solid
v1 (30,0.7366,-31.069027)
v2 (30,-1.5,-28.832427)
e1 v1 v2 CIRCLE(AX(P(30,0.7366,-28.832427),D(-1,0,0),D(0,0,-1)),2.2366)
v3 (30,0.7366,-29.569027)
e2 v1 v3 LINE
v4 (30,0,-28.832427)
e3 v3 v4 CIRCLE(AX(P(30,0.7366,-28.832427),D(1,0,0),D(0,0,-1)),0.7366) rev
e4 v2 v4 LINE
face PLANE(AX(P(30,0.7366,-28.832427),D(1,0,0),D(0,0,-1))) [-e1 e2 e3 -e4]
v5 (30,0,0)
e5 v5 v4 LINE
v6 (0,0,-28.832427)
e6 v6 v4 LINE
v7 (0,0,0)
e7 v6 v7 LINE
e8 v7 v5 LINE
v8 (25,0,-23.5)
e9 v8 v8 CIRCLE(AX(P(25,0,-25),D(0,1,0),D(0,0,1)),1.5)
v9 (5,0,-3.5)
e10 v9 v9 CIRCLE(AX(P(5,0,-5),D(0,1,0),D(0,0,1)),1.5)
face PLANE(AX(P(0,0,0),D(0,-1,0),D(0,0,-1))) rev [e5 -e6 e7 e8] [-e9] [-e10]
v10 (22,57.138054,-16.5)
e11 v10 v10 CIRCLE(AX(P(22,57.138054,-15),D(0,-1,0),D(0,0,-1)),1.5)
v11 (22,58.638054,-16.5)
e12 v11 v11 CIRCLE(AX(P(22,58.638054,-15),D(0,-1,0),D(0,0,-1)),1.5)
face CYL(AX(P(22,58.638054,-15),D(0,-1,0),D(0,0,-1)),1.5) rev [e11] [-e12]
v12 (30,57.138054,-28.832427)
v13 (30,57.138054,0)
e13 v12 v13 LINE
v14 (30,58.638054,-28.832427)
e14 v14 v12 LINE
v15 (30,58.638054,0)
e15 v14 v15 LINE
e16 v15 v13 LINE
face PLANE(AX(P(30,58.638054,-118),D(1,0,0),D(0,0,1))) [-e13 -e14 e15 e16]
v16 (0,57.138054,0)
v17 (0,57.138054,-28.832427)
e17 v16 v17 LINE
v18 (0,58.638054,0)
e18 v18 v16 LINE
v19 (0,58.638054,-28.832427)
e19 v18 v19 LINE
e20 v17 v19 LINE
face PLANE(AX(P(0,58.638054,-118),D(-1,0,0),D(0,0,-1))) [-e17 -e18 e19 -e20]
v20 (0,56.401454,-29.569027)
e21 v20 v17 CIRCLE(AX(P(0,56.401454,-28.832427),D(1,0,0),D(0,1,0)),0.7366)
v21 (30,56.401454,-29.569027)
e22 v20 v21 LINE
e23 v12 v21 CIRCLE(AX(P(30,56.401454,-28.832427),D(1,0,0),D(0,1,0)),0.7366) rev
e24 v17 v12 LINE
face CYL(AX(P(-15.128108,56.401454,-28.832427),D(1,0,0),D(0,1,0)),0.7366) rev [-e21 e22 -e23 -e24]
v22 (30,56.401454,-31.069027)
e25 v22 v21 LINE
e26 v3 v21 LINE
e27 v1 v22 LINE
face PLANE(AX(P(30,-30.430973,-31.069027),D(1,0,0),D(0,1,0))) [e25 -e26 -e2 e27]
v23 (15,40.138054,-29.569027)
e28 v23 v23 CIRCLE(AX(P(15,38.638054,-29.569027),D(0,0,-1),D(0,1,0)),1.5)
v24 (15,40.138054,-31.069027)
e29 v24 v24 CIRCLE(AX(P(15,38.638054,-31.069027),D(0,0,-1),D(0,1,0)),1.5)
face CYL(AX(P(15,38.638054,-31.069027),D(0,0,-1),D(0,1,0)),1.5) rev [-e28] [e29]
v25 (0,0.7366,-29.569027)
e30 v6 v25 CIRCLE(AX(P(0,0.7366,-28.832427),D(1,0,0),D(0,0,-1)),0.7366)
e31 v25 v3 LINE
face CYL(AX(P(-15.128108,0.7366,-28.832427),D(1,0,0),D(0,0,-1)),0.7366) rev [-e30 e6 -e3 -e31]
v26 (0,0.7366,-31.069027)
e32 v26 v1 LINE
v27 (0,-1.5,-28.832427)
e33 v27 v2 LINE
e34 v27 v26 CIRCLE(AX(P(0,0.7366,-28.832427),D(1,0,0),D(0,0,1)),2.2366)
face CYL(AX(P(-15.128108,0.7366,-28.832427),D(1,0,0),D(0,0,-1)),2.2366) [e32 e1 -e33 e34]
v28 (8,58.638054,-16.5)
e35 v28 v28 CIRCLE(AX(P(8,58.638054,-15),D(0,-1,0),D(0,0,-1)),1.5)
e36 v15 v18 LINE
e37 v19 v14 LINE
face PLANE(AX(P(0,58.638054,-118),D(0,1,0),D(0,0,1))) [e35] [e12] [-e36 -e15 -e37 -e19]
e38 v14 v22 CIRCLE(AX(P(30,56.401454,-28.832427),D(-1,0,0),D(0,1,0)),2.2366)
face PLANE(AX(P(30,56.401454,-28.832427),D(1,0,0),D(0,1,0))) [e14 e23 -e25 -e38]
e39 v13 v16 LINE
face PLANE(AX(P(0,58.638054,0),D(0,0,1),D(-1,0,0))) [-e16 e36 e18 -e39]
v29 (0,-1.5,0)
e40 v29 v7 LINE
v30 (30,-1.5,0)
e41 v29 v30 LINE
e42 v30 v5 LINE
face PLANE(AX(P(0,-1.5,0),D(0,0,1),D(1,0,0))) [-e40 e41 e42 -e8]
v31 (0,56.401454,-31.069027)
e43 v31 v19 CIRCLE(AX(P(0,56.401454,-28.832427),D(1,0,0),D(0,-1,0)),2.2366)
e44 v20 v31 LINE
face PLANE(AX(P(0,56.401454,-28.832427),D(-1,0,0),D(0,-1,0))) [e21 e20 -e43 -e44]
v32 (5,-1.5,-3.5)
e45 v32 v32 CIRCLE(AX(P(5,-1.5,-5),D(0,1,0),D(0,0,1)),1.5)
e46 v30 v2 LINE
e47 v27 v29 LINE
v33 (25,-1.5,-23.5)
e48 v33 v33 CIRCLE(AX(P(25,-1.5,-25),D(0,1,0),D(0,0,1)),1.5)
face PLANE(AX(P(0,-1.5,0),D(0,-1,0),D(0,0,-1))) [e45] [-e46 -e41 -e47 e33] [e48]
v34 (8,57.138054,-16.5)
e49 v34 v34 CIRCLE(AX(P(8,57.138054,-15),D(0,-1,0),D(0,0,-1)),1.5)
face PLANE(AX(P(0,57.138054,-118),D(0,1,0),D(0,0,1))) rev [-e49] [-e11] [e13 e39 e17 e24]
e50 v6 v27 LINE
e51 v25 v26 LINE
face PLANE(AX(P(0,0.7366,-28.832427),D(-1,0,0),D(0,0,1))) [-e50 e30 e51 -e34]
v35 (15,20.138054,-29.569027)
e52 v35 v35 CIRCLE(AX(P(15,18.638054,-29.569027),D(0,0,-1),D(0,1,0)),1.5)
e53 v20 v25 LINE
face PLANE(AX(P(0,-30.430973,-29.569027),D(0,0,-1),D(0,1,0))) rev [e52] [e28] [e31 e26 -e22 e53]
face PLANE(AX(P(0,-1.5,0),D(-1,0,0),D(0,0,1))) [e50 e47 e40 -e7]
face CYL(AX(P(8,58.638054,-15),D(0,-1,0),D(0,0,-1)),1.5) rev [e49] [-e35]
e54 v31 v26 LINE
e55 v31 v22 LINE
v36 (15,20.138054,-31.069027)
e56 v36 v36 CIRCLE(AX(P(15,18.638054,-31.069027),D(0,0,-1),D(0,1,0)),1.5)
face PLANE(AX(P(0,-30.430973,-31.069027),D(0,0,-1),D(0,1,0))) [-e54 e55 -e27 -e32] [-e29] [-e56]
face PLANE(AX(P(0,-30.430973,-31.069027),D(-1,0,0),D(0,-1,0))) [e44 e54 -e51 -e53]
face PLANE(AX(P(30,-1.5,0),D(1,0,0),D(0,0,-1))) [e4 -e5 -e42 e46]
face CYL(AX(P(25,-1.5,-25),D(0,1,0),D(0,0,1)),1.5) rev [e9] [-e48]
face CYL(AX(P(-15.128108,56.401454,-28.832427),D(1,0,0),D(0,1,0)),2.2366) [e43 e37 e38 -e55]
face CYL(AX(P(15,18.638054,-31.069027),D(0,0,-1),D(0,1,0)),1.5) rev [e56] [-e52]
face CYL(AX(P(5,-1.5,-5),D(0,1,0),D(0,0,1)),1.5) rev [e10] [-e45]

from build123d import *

# Parameters (mm, degrees)
SKETCH1_W                       = 30
SKETCH1_H                       = 118
SKETCH1_R                       = 1.5
BASE_FLANGE1_DEPTH              = 1.5
SKETCHED_BEND1_DEPTH            = 30
SKETCHED_START                  = 9.5000001
SKETCHED_BEND1_2_DEPTH          = 10.9999998
SKETCHED_BEND1_3_DEPTH          = 6.4999999
SKETCHED_START_2                = 23.5000001
SKETCHED_BEND1_4_DEPTH          = 6.4999999
SKETCHED_START_3                = 6.4999999
SKETCHED_BEND1_5_DEPTH          = 17.0000002
SKETCHED_START_4                = 57.138054181
SKETCHED_BEND1_6_OUTLINE_R      = 1.5
SKETCHED_BEND1_6_DEPTH          = 1.5
F_3_0MM_PRESS_DOWEL_HOLE1_D     = 3
F_3_0MM_PRESS_DOWEL_HOLE1_DEPTH = 6
F_3_0MM_PRESS_DOWEL_HOLE1_TIP   = 0.901290929
F_3_0MM_PRESS_DOWEL_HOLE2_D     = 3


with BuildPart() as part:
    # Base-Flange1: sheet metal written as solids
    # Sketch1 → Base-Flange1 (new body)
    with BuildSketch(Plane(origin=(0, 0, 0), x_dir=(1, 0, 0), z_dir=(0, 1, 0))):
        with Locations((15, 59)):
            Rectangle(SKETCH1_W, SKETCH1_H)
        with Locations(Location((8, 103, 0), (0, 0, 270))):
            Circle(SKETCH1_R, mode=Mode.SUBTRACT)
        with Locations(Location((22, 103, 0), (0, 0, 270))):
            Circle(SKETCH1_R, mode=Mode.SUBTRACT)
        with Locations(Location((25, 25, 0), (0, 0, 270))):
            Circle(SKETCH1_R, mode=Mode.SUBTRACT)
        with Locations(Location((5, 5, 0), (0, 0, 270))):
            Circle(SKETCH1_R, mode=Mode.SUBTRACT)
    extrude(amount=-BASE_FLANGE1_DEPTH)

    # Sketched Bend1: read off the stored shape, not the designer's step
    # Sketched Bend1 outline → Sketched Bend1 (cut)
    with BuildSketch(Plane.YZ):
        with BuildLine():
            Line((0, -118), (0, -30.944250946))
            ThreePointArc((0, -30.944250946), (-1.086838938, -30.127591172), (-1.5, -28.83242709))
            Line((-1.5, -28.83242709), (-1.5, -118))
            Line((-1.5, -118), (0, -118))
        make_face()
    extrude(amount=SKETCHED_BEND1_DEPTH, mode=Mode.SUBTRACT)

    # Sketched Bend1 2 outline → Sketched Bend1 2 (add)
    with BuildSketch(Plane.YZ.offset(SKETCHED_START)):
        with BuildLine():
            Line((56.401454181, -29.56902709), (0.7366, -29.56902709))
            ThreePointArc((0.7366, -29.56902709), (0.215745145, -29.353281945), (0, -28.83242709))
            Line((0, -28.83242709), (0, -30.944250946))
            ThreePointArc((0, -30.944250946), (0.363053267, -31.037612433), (0.7366, -31.06902709))
            Line((0.7366, -31.06902709), (56.401454181, -31.06902709))
            ThreePointArc((56.401454181, -31.06902709), (57.982969207, -30.413942116), (58.638054181, -28.83242709))
            Line((58.638054181, -28.83242709), (58.638054181, 0))
            Line((58.638054181, 0), (57.138054181, 0))
            Line((57.138054181, 0), (57.138054181, -28.83242709))
            ThreePointArc((57.138054181, -28.83242709), (56.922309036, -29.353281945), (56.401454181, -29.56902709))
        make_face()
    extrude(amount=SKETCHED_BEND1_2_DEPTH)

    # Sketched Bend1 3 outline → Sketched Bend1 3 (add)
    with BuildSketch(Plane.YZ):
        with BuildLine():
            Line((56.401454181, -29.56902709), (0.7366, -29.56902709))
            ThreePointArc((0.7366, -29.56902709), (0.215745145, -29.353281945), (0, -28.83242709))
            Line((0, -28.83242709), (0, -30.944250946))
            ThreePointArc((0, -30.944250946), (0.363053267, -31.037612433), (0.7366, -31.06902709))
            Line((0.7366, -31.06902709), (56.401454181, -31.06902709))
            ThreePointArc((56.401454181, -31.06902709), (57.982969207, -30.413942116), (58.638054181, -28.83242709))
            Line((58.638054181, -28.83242709), (58.638054181, 0))
            Line((58.638054181, 0), (57.138054181, 0))
            Line((57.138054181, 0), (57.138054181, -28.83242709))
            ThreePointArc((57.138054181, -28.83242709), (56.922309036, -29.353281945), (56.401454181, -29.56902709))
        make_face()
    extrude(amount=SKETCHED_BEND1_3_DEPTH)

    # Sketched Bend1 4 outline → Sketched Bend1 4 (add)
    with BuildSketch(Plane.YZ.offset(SKETCHED_START_2)):
        with BuildLine():
            Line((56.401454181, -29.56902709), (0.7366, -29.56902709))
            ThreePointArc((0.7366, -29.56902709), (0.215745145, -29.353281945), (0, -28.83242709))
            Line((0, -28.83242709), (0, -30.944250946))
            ThreePointArc((0, -30.944250946), (0.363053267, -31.037612433), (0.7366, -31.06902709))
            Line((0.7366, -31.06902709), (56.401454181, -31.06902709))
            ThreePointArc((56.401454181, -31.06902709), (57.982969207, -30.413942116), (58.638054181, -28.83242709))
            Line((58.638054181, -28.83242709), (58.638054181, 0))
            Line((58.638054181, 0), (57.138054181, 0))
            Line((57.138054181, 0), (57.138054181, -28.83242709))
            ThreePointArc((57.138054181, -28.83242709), (56.922309036, -29.353281945), (56.401454181, -29.56902709))
        make_face()
    extrude(amount=SKETCHED_BEND1_4_DEPTH)

    # Sketched Bend1 5 outline → Sketched Bend1 5 (add)
    with BuildSketch(Plane.YZ.offset(SKETCHED_START_3)):
        with BuildLine():
            Line((56.401454181, -29.56902709), (0.7366, -29.56902709))
            ThreePointArc((0.7366, -29.56902709), (0.215745145, -29.353281945), (0, -28.83242709))
            Line((0, -28.83242709), (0, -30.944250946))
            ThreePointArc((0, -30.944250946), (0.363053267, -31.037612433), (0.7366, -31.06902709))
            Line((0.7366, -31.06902709), (56.401454181, -31.06902709))
            ThreePointArc((56.401454181, -31.06902709), (57.982969207, -30.413942116), (58.638054181, -28.83242709))
            Line((58.638054181, -28.83242709), (58.638054181, 0))
            Line((58.638054181, 0), (57.138054181, 0))
            Line((57.138054181, 0), (57.138054181, -28.83242709))
            ThreePointArc((57.138054181, -28.83242709), (56.922309036, -29.353281945), (56.401454181, -29.56902709))
        make_face()
    extrude(amount=SKETCHED_BEND1_5_DEPTH)

    # Sketched Bend1 6 outline → Sketched Bend1 6 (cut)
    with BuildSketch(Plane(origin=(0, 0, 0), x_dir=(1, 0, 0), z_dir=(0, 1, 0)).offset(SKETCHED_START_4)):
        with Locations((8, 15)):
            Circle(SKETCHED_BEND1_6_OUTLINE_R)
        with Locations((22, 15)):
            Circle(SKETCHED_BEND1_6_OUTLINE_R)
    extrude(amount=SKETCHED_BEND1_6_DEPTH, mode=Mode.SUBTRACT)

    # Ø3.0mm Press Dowel Hole1
    with Locations(Plane(origin=(-227.525513363, -7.5, -157.600386311), x_dir=(1, 0, 0), z_dir=(0, -1, 0))):
        with Locations((220.525513363, 156.531359221), (102.525513363, 181.531359221), (102.525513363, 271.531359221), (89.19270005, 226.531359221), (210.525513363, 317.793651488), (230.525513363, 317.793651488), (252.525513363, 320.462332131), (232.525513363, 300.462332131), (252.525513363, 132.600386311), (232.525513363, 152.600386311), (111.286271896, 136.531359221), (91.286271896, 136.531359221), (41.525513363, 196.432813402), (13.525513363, 196.432813402), (41.525513363, 138.767959221), (13.525513363, 138.767959221), (41.525513363, 256.62990504), (13.525513363, 256.62990504), (41.525513363, 314.294759221), (13.525513363, 314.294759221)):
            Hole(F_3_0MM_PRESS_DOWEL_HOLE1_D / 2, depth=F_3_0MM_PRESS_DOWEL_HOLE1_DEPTH)
            with Locations((0, 0, -(F_3_0MM_PRESS_DOWEL_HOLE1_DEPTH + F_3_0MM_PRESS_DOWEL_HOLE1_TIP / 2))):  # 118° drill point
                Cone(0, F_3_0MM_PRESS_DOWEL_HOLE1_D / 2, F_3_0MM_PRESS_DOWEL_HOLE1_TIP, mode=Mode.SUBTRACT)

    # Ø3.0mm Press Dowel Hole2 (through all)
    with Locations(Plane(origin=(0, 0, -31.06902709), x_dir=(-1, 0, 0), z_dir=(0, 0, -1))):
        with Locations((-15, 38.638054181), (-15, 18.638054181)):
            Hole(F_3_0MM_PRESS_DOWEL_HOLE2_D / 2)


solid = part.part
